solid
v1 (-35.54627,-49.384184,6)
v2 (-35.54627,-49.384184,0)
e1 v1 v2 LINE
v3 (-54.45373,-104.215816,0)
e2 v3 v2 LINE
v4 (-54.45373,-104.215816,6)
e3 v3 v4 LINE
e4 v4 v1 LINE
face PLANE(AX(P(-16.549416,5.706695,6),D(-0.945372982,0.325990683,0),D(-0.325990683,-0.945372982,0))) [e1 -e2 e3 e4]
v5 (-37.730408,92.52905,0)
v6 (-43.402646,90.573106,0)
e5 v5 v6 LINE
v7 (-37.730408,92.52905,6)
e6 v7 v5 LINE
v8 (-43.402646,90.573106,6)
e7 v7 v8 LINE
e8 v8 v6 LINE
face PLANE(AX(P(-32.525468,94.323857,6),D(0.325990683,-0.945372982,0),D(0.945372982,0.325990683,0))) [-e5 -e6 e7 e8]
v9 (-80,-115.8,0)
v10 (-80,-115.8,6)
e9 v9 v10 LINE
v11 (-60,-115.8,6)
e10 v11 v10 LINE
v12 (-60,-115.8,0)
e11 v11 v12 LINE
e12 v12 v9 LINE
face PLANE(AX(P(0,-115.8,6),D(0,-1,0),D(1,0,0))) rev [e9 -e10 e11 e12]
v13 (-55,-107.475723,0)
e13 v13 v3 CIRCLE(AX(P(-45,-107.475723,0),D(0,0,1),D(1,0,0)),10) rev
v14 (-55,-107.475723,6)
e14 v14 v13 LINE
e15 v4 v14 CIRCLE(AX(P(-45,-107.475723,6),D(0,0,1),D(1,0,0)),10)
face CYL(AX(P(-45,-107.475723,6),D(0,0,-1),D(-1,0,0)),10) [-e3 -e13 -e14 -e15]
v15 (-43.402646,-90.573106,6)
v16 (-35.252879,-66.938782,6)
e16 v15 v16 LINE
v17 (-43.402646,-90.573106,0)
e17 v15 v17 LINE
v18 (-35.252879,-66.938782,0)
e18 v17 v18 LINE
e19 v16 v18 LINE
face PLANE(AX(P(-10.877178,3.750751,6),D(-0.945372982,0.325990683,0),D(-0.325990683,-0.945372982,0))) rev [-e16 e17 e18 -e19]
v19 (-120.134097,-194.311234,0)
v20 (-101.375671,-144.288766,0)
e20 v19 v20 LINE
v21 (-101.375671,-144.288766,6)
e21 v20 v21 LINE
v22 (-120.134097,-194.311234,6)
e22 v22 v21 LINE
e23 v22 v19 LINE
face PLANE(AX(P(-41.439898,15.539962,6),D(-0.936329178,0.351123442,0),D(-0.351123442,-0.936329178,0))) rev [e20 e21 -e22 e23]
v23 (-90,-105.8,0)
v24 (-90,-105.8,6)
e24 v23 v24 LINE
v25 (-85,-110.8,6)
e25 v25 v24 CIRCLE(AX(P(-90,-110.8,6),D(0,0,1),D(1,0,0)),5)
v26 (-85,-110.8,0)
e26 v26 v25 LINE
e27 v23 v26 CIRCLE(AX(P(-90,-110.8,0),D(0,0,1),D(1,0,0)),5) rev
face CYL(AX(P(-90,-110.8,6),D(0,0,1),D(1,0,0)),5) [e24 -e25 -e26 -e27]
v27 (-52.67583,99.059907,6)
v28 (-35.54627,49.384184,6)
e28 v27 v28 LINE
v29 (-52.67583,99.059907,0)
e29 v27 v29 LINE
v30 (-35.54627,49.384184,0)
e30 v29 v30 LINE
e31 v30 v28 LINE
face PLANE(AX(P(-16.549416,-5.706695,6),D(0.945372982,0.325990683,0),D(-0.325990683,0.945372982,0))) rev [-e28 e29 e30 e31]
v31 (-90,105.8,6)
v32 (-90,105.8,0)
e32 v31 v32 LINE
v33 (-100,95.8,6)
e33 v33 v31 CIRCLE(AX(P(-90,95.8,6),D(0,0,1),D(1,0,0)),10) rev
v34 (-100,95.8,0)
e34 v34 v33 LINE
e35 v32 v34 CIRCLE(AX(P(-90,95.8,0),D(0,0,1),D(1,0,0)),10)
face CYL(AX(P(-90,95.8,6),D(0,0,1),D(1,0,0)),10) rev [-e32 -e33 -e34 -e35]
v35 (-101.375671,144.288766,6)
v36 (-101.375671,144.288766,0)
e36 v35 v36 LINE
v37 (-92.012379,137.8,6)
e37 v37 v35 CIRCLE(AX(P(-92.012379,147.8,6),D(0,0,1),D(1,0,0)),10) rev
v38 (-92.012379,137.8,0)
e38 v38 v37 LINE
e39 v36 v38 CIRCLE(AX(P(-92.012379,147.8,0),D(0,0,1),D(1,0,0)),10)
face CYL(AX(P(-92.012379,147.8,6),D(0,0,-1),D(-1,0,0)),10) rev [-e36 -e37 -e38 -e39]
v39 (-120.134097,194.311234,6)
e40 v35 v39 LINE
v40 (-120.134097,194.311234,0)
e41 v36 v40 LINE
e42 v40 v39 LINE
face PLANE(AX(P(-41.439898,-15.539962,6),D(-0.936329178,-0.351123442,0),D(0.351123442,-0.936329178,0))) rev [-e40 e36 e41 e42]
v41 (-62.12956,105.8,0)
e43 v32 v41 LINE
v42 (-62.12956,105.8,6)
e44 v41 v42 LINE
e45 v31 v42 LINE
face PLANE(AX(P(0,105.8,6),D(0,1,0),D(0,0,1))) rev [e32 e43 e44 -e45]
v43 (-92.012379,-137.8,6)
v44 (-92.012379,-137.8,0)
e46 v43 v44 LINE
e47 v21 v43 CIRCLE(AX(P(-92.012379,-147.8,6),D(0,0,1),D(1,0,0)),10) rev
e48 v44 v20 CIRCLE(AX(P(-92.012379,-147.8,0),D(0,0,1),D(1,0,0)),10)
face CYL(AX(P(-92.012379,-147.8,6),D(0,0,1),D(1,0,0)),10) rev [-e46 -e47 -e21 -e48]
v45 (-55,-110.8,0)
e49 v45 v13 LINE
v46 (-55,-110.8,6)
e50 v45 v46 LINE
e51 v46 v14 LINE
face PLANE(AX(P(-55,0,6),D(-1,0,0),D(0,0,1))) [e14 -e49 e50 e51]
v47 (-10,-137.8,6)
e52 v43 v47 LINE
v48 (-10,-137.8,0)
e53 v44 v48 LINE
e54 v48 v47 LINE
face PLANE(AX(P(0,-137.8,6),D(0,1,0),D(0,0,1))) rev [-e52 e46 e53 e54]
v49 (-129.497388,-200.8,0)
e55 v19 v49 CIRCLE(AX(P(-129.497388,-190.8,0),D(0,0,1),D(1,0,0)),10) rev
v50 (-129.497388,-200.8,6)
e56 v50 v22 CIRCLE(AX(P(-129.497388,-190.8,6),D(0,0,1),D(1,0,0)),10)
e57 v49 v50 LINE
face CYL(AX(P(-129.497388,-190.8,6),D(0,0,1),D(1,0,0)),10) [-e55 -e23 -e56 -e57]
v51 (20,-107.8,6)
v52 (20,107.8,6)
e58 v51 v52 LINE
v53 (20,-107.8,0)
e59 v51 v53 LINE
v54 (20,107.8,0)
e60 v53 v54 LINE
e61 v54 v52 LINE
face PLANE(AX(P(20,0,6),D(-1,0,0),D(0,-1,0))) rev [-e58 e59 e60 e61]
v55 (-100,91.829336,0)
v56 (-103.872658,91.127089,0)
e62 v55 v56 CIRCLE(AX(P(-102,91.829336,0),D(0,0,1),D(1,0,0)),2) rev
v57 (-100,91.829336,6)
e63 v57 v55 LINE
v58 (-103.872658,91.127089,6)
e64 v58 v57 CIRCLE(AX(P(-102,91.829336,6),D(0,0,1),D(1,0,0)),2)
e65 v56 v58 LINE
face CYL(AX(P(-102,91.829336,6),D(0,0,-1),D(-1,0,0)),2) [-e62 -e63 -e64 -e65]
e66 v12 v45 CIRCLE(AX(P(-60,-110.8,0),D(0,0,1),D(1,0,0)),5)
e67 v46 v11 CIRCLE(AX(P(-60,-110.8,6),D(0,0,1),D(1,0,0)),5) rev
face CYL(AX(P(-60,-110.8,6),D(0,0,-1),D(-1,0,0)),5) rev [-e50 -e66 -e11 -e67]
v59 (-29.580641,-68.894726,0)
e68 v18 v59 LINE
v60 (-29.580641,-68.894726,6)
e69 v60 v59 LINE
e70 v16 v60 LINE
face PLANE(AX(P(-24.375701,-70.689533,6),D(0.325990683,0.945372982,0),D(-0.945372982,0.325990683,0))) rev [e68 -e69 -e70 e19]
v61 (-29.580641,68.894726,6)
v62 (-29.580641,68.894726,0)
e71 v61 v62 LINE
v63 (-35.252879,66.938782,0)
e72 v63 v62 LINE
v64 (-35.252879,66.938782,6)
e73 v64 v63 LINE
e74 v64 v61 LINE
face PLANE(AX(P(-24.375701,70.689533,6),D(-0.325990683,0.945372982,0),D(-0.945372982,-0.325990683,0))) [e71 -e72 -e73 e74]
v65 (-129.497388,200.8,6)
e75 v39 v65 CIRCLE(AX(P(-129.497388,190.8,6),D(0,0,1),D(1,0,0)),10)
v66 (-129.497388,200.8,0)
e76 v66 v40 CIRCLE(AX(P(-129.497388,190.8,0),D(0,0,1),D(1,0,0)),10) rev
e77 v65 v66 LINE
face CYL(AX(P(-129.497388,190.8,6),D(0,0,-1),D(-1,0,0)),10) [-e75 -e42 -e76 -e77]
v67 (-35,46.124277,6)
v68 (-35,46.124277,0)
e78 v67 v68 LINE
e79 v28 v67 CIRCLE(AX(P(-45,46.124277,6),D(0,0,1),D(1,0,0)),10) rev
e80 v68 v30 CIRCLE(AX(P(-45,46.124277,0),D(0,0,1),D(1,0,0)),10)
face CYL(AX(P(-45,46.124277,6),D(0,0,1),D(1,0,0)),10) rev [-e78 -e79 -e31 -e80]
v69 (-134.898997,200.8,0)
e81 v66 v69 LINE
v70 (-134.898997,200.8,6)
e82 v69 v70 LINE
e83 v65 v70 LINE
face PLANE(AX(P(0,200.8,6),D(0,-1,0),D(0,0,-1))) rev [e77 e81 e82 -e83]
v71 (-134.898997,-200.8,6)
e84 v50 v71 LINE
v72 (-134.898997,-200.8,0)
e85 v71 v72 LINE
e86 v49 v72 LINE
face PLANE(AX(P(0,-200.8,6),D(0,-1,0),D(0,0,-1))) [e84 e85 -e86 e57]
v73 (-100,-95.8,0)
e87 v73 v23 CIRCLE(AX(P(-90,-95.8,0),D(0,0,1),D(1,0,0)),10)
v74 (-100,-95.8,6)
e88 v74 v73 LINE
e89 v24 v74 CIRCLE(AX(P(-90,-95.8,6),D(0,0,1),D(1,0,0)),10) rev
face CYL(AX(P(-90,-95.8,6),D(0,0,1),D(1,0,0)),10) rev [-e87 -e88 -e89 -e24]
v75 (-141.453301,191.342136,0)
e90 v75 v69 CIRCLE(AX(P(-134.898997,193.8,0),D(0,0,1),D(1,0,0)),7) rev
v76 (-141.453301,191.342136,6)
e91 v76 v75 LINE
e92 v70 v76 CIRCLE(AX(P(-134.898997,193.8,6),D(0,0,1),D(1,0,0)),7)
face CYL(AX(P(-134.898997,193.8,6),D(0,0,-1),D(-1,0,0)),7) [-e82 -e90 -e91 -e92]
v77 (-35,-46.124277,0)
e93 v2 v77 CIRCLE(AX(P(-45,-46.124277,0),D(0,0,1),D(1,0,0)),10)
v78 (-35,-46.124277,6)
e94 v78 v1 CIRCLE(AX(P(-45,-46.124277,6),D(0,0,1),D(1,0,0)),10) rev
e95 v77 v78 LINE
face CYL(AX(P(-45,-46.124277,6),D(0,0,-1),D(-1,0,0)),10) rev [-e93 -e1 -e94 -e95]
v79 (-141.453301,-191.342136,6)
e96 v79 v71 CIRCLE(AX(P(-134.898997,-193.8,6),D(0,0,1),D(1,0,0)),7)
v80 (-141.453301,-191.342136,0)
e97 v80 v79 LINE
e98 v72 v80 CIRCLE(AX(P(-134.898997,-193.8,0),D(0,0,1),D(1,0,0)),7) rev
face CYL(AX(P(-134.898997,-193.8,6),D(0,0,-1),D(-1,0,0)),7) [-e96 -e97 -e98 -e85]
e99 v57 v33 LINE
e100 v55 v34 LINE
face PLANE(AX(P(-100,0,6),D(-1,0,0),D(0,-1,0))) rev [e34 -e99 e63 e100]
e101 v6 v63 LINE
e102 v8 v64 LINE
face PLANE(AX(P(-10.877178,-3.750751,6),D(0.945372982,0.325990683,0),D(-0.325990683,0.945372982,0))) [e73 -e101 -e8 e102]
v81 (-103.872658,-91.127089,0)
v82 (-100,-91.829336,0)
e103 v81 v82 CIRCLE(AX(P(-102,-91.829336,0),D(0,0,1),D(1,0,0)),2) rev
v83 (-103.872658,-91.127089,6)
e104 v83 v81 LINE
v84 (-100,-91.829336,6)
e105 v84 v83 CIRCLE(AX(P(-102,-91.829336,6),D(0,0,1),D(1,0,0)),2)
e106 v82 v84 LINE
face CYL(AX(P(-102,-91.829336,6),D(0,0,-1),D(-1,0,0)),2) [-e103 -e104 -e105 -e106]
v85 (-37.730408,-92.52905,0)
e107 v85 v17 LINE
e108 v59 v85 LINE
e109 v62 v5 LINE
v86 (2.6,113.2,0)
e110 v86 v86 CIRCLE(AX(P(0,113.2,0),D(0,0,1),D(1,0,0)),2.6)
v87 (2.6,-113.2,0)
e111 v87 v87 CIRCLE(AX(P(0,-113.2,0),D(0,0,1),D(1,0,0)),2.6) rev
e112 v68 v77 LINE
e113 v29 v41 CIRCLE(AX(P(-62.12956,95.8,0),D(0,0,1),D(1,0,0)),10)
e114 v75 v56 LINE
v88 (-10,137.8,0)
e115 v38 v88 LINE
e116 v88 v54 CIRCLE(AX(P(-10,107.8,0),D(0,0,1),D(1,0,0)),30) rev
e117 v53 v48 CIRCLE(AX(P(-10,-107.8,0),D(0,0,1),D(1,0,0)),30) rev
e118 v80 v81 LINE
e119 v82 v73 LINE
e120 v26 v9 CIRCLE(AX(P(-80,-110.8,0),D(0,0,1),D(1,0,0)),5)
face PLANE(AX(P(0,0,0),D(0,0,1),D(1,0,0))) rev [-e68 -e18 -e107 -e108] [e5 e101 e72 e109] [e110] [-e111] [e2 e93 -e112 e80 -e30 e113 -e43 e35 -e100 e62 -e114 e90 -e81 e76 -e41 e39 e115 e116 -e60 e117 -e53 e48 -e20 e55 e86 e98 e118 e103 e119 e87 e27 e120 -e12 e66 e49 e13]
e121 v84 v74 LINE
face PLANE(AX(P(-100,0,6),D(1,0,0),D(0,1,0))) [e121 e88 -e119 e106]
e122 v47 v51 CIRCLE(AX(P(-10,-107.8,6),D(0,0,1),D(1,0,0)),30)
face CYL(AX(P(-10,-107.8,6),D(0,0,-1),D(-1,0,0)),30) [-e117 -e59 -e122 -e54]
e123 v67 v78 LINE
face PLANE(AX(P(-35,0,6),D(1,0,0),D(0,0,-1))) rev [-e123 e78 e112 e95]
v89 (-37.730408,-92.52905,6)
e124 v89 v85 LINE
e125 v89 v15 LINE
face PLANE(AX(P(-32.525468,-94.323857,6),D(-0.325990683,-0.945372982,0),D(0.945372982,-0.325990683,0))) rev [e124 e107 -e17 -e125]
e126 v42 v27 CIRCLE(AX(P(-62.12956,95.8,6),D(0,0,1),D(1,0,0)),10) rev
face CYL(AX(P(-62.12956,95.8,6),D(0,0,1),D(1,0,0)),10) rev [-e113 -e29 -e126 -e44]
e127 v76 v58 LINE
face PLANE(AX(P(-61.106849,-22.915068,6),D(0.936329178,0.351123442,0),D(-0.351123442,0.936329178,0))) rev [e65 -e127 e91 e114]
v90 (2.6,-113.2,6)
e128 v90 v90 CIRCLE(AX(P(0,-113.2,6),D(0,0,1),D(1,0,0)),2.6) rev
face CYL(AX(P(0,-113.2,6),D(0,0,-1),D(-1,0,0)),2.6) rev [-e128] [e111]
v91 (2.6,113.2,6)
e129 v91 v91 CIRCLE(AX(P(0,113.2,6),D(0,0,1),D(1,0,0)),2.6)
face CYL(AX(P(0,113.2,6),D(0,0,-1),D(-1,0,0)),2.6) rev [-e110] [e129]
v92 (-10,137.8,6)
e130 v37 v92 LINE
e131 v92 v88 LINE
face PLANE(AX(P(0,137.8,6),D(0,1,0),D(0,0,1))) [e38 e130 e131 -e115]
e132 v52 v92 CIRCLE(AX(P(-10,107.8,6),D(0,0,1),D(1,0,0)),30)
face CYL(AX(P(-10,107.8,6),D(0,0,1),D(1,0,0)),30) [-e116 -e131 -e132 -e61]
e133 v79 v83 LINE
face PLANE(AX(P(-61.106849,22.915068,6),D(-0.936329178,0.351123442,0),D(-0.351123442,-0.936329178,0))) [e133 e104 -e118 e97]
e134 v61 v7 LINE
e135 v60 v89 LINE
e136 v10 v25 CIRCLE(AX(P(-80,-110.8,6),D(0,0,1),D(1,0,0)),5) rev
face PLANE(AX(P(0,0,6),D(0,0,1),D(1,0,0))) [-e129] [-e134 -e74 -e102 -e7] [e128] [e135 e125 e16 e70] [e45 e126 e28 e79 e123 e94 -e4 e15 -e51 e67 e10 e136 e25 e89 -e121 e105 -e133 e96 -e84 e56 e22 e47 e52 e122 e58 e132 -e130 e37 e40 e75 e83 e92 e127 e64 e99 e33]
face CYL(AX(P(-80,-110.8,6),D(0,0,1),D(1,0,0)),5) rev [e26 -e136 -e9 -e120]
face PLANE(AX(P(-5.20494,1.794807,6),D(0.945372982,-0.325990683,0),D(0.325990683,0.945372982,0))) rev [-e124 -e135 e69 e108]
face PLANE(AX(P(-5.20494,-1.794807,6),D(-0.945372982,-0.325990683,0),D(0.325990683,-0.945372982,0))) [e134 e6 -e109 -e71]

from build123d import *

# Parameters (mm, degrees)
ESBO_O1_R                = 2.6
RESSALTO_EXTRUS_O1_DEPTH = 6
FILETE1_R                = 2
FILETE3_R                = 10
FILETE4_R                = 7
FILETE5_R                = 5
FILETE6_R                = 30


with BuildPart() as part:
    # Esboço1 → Ressalto-extrusão1 (new body)
    with BuildSketch(Plane.XY):
        Polygon((-98.942383725, -137.8), (20, -137.8), (20, 137.8), (-98.942383725, 137.8), (-122.567383725, 200.8), (-145, 200.8), (-100, 80.8), (-100, 105.8), (-55, 105.8), (-35, 47.8), (-35, -47.8), (-55, -105.8), (-55, -115.8), (-85, -115.8), (-85, -105.8), (-100, -105.8), (-100, -80.8), (-145, -200.8), (-122.567383725, -200.8), align=None)
        Polygon((-35.252878569, -66.93878183), (-29.580640679, -68.89472593), (-37.730407762, -92.52905047), (-43.402645652, -90.57310637), align=None, mode=Mode.SUBTRACT)
        Polygon((-43.402645652, 90.57310637), (-37.730407762, 92.52905047), (-29.580640679, 68.89472593), (-35.252878569, 66.93878183), align=None, mode=Mode.SUBTRACT)
        with Locations((0, 113.2)):
            Circle(ESBO_O1_R, mode=Mode.SUBTRACT)
        with Locations((0, -113.2)):
            Circle(ESBO_O1_R, mode=Mode.SUBTRACT)
    extrude(amount=RESSALTO_EXTRUS_O1_DEPTH)

    # Filete1
    filete1_edges = [part.edges().sort_by_distance(p)[0] for p in [
        (-100, -80.8, 3),
        (-100, 80.8, 3),
    ]]
    fillet(filete1_edges, radius=FILETE1_R)

    # Filete3
    filete3_edges = [part.edges().sort_by_distance(p)[0] for p in [
        (-98.942383725, -137.8, 3),
        (-122.567383725, -200.8, 3),
        (-100, -105.8, 3),
        (-55, -105.8, 3),
        (-35, -47.8, 3),
        (-35, 47.8, 3),
        (-55, 105.8, 3),
        (-100, 105.8, 3),
        (-122.567383725, 200.8, 3),
        (-98.942383725, 137.8, 3),
    ]]
    fillet(filete3_edges, radius=FILETE3_R)

    # Filete4
    filete4_edges = [part.edges().sort_by_distance(p)[0] for p in [
        (-145, -200.8, 3),
        (-145, 200.8, 3),
    ]]
    fillet(filete4_edges, radius=FILETE4_R)

    # Filete5
    filete5_edges = [part.edges().sort_by_distance(p)[0] for p in [
        (-85, -115.8, 3),
        (-55, -115.8, 3),
        (-85, -105.8, 3),
    ]]
    fillet(filete5_edges, radius=FILETE5_R - 0.0001)  # a hair under: the kernel refuses the full size

    # Filete6
    filete6_edges = [part.edges().sort_by_distance(p)[0] for p in [
        (20, 137.8, 3),
        (20, -137.8, 3),
    ]]
    fillet(filete6_edges, radius=FILETE6_R)


solid = part.part
